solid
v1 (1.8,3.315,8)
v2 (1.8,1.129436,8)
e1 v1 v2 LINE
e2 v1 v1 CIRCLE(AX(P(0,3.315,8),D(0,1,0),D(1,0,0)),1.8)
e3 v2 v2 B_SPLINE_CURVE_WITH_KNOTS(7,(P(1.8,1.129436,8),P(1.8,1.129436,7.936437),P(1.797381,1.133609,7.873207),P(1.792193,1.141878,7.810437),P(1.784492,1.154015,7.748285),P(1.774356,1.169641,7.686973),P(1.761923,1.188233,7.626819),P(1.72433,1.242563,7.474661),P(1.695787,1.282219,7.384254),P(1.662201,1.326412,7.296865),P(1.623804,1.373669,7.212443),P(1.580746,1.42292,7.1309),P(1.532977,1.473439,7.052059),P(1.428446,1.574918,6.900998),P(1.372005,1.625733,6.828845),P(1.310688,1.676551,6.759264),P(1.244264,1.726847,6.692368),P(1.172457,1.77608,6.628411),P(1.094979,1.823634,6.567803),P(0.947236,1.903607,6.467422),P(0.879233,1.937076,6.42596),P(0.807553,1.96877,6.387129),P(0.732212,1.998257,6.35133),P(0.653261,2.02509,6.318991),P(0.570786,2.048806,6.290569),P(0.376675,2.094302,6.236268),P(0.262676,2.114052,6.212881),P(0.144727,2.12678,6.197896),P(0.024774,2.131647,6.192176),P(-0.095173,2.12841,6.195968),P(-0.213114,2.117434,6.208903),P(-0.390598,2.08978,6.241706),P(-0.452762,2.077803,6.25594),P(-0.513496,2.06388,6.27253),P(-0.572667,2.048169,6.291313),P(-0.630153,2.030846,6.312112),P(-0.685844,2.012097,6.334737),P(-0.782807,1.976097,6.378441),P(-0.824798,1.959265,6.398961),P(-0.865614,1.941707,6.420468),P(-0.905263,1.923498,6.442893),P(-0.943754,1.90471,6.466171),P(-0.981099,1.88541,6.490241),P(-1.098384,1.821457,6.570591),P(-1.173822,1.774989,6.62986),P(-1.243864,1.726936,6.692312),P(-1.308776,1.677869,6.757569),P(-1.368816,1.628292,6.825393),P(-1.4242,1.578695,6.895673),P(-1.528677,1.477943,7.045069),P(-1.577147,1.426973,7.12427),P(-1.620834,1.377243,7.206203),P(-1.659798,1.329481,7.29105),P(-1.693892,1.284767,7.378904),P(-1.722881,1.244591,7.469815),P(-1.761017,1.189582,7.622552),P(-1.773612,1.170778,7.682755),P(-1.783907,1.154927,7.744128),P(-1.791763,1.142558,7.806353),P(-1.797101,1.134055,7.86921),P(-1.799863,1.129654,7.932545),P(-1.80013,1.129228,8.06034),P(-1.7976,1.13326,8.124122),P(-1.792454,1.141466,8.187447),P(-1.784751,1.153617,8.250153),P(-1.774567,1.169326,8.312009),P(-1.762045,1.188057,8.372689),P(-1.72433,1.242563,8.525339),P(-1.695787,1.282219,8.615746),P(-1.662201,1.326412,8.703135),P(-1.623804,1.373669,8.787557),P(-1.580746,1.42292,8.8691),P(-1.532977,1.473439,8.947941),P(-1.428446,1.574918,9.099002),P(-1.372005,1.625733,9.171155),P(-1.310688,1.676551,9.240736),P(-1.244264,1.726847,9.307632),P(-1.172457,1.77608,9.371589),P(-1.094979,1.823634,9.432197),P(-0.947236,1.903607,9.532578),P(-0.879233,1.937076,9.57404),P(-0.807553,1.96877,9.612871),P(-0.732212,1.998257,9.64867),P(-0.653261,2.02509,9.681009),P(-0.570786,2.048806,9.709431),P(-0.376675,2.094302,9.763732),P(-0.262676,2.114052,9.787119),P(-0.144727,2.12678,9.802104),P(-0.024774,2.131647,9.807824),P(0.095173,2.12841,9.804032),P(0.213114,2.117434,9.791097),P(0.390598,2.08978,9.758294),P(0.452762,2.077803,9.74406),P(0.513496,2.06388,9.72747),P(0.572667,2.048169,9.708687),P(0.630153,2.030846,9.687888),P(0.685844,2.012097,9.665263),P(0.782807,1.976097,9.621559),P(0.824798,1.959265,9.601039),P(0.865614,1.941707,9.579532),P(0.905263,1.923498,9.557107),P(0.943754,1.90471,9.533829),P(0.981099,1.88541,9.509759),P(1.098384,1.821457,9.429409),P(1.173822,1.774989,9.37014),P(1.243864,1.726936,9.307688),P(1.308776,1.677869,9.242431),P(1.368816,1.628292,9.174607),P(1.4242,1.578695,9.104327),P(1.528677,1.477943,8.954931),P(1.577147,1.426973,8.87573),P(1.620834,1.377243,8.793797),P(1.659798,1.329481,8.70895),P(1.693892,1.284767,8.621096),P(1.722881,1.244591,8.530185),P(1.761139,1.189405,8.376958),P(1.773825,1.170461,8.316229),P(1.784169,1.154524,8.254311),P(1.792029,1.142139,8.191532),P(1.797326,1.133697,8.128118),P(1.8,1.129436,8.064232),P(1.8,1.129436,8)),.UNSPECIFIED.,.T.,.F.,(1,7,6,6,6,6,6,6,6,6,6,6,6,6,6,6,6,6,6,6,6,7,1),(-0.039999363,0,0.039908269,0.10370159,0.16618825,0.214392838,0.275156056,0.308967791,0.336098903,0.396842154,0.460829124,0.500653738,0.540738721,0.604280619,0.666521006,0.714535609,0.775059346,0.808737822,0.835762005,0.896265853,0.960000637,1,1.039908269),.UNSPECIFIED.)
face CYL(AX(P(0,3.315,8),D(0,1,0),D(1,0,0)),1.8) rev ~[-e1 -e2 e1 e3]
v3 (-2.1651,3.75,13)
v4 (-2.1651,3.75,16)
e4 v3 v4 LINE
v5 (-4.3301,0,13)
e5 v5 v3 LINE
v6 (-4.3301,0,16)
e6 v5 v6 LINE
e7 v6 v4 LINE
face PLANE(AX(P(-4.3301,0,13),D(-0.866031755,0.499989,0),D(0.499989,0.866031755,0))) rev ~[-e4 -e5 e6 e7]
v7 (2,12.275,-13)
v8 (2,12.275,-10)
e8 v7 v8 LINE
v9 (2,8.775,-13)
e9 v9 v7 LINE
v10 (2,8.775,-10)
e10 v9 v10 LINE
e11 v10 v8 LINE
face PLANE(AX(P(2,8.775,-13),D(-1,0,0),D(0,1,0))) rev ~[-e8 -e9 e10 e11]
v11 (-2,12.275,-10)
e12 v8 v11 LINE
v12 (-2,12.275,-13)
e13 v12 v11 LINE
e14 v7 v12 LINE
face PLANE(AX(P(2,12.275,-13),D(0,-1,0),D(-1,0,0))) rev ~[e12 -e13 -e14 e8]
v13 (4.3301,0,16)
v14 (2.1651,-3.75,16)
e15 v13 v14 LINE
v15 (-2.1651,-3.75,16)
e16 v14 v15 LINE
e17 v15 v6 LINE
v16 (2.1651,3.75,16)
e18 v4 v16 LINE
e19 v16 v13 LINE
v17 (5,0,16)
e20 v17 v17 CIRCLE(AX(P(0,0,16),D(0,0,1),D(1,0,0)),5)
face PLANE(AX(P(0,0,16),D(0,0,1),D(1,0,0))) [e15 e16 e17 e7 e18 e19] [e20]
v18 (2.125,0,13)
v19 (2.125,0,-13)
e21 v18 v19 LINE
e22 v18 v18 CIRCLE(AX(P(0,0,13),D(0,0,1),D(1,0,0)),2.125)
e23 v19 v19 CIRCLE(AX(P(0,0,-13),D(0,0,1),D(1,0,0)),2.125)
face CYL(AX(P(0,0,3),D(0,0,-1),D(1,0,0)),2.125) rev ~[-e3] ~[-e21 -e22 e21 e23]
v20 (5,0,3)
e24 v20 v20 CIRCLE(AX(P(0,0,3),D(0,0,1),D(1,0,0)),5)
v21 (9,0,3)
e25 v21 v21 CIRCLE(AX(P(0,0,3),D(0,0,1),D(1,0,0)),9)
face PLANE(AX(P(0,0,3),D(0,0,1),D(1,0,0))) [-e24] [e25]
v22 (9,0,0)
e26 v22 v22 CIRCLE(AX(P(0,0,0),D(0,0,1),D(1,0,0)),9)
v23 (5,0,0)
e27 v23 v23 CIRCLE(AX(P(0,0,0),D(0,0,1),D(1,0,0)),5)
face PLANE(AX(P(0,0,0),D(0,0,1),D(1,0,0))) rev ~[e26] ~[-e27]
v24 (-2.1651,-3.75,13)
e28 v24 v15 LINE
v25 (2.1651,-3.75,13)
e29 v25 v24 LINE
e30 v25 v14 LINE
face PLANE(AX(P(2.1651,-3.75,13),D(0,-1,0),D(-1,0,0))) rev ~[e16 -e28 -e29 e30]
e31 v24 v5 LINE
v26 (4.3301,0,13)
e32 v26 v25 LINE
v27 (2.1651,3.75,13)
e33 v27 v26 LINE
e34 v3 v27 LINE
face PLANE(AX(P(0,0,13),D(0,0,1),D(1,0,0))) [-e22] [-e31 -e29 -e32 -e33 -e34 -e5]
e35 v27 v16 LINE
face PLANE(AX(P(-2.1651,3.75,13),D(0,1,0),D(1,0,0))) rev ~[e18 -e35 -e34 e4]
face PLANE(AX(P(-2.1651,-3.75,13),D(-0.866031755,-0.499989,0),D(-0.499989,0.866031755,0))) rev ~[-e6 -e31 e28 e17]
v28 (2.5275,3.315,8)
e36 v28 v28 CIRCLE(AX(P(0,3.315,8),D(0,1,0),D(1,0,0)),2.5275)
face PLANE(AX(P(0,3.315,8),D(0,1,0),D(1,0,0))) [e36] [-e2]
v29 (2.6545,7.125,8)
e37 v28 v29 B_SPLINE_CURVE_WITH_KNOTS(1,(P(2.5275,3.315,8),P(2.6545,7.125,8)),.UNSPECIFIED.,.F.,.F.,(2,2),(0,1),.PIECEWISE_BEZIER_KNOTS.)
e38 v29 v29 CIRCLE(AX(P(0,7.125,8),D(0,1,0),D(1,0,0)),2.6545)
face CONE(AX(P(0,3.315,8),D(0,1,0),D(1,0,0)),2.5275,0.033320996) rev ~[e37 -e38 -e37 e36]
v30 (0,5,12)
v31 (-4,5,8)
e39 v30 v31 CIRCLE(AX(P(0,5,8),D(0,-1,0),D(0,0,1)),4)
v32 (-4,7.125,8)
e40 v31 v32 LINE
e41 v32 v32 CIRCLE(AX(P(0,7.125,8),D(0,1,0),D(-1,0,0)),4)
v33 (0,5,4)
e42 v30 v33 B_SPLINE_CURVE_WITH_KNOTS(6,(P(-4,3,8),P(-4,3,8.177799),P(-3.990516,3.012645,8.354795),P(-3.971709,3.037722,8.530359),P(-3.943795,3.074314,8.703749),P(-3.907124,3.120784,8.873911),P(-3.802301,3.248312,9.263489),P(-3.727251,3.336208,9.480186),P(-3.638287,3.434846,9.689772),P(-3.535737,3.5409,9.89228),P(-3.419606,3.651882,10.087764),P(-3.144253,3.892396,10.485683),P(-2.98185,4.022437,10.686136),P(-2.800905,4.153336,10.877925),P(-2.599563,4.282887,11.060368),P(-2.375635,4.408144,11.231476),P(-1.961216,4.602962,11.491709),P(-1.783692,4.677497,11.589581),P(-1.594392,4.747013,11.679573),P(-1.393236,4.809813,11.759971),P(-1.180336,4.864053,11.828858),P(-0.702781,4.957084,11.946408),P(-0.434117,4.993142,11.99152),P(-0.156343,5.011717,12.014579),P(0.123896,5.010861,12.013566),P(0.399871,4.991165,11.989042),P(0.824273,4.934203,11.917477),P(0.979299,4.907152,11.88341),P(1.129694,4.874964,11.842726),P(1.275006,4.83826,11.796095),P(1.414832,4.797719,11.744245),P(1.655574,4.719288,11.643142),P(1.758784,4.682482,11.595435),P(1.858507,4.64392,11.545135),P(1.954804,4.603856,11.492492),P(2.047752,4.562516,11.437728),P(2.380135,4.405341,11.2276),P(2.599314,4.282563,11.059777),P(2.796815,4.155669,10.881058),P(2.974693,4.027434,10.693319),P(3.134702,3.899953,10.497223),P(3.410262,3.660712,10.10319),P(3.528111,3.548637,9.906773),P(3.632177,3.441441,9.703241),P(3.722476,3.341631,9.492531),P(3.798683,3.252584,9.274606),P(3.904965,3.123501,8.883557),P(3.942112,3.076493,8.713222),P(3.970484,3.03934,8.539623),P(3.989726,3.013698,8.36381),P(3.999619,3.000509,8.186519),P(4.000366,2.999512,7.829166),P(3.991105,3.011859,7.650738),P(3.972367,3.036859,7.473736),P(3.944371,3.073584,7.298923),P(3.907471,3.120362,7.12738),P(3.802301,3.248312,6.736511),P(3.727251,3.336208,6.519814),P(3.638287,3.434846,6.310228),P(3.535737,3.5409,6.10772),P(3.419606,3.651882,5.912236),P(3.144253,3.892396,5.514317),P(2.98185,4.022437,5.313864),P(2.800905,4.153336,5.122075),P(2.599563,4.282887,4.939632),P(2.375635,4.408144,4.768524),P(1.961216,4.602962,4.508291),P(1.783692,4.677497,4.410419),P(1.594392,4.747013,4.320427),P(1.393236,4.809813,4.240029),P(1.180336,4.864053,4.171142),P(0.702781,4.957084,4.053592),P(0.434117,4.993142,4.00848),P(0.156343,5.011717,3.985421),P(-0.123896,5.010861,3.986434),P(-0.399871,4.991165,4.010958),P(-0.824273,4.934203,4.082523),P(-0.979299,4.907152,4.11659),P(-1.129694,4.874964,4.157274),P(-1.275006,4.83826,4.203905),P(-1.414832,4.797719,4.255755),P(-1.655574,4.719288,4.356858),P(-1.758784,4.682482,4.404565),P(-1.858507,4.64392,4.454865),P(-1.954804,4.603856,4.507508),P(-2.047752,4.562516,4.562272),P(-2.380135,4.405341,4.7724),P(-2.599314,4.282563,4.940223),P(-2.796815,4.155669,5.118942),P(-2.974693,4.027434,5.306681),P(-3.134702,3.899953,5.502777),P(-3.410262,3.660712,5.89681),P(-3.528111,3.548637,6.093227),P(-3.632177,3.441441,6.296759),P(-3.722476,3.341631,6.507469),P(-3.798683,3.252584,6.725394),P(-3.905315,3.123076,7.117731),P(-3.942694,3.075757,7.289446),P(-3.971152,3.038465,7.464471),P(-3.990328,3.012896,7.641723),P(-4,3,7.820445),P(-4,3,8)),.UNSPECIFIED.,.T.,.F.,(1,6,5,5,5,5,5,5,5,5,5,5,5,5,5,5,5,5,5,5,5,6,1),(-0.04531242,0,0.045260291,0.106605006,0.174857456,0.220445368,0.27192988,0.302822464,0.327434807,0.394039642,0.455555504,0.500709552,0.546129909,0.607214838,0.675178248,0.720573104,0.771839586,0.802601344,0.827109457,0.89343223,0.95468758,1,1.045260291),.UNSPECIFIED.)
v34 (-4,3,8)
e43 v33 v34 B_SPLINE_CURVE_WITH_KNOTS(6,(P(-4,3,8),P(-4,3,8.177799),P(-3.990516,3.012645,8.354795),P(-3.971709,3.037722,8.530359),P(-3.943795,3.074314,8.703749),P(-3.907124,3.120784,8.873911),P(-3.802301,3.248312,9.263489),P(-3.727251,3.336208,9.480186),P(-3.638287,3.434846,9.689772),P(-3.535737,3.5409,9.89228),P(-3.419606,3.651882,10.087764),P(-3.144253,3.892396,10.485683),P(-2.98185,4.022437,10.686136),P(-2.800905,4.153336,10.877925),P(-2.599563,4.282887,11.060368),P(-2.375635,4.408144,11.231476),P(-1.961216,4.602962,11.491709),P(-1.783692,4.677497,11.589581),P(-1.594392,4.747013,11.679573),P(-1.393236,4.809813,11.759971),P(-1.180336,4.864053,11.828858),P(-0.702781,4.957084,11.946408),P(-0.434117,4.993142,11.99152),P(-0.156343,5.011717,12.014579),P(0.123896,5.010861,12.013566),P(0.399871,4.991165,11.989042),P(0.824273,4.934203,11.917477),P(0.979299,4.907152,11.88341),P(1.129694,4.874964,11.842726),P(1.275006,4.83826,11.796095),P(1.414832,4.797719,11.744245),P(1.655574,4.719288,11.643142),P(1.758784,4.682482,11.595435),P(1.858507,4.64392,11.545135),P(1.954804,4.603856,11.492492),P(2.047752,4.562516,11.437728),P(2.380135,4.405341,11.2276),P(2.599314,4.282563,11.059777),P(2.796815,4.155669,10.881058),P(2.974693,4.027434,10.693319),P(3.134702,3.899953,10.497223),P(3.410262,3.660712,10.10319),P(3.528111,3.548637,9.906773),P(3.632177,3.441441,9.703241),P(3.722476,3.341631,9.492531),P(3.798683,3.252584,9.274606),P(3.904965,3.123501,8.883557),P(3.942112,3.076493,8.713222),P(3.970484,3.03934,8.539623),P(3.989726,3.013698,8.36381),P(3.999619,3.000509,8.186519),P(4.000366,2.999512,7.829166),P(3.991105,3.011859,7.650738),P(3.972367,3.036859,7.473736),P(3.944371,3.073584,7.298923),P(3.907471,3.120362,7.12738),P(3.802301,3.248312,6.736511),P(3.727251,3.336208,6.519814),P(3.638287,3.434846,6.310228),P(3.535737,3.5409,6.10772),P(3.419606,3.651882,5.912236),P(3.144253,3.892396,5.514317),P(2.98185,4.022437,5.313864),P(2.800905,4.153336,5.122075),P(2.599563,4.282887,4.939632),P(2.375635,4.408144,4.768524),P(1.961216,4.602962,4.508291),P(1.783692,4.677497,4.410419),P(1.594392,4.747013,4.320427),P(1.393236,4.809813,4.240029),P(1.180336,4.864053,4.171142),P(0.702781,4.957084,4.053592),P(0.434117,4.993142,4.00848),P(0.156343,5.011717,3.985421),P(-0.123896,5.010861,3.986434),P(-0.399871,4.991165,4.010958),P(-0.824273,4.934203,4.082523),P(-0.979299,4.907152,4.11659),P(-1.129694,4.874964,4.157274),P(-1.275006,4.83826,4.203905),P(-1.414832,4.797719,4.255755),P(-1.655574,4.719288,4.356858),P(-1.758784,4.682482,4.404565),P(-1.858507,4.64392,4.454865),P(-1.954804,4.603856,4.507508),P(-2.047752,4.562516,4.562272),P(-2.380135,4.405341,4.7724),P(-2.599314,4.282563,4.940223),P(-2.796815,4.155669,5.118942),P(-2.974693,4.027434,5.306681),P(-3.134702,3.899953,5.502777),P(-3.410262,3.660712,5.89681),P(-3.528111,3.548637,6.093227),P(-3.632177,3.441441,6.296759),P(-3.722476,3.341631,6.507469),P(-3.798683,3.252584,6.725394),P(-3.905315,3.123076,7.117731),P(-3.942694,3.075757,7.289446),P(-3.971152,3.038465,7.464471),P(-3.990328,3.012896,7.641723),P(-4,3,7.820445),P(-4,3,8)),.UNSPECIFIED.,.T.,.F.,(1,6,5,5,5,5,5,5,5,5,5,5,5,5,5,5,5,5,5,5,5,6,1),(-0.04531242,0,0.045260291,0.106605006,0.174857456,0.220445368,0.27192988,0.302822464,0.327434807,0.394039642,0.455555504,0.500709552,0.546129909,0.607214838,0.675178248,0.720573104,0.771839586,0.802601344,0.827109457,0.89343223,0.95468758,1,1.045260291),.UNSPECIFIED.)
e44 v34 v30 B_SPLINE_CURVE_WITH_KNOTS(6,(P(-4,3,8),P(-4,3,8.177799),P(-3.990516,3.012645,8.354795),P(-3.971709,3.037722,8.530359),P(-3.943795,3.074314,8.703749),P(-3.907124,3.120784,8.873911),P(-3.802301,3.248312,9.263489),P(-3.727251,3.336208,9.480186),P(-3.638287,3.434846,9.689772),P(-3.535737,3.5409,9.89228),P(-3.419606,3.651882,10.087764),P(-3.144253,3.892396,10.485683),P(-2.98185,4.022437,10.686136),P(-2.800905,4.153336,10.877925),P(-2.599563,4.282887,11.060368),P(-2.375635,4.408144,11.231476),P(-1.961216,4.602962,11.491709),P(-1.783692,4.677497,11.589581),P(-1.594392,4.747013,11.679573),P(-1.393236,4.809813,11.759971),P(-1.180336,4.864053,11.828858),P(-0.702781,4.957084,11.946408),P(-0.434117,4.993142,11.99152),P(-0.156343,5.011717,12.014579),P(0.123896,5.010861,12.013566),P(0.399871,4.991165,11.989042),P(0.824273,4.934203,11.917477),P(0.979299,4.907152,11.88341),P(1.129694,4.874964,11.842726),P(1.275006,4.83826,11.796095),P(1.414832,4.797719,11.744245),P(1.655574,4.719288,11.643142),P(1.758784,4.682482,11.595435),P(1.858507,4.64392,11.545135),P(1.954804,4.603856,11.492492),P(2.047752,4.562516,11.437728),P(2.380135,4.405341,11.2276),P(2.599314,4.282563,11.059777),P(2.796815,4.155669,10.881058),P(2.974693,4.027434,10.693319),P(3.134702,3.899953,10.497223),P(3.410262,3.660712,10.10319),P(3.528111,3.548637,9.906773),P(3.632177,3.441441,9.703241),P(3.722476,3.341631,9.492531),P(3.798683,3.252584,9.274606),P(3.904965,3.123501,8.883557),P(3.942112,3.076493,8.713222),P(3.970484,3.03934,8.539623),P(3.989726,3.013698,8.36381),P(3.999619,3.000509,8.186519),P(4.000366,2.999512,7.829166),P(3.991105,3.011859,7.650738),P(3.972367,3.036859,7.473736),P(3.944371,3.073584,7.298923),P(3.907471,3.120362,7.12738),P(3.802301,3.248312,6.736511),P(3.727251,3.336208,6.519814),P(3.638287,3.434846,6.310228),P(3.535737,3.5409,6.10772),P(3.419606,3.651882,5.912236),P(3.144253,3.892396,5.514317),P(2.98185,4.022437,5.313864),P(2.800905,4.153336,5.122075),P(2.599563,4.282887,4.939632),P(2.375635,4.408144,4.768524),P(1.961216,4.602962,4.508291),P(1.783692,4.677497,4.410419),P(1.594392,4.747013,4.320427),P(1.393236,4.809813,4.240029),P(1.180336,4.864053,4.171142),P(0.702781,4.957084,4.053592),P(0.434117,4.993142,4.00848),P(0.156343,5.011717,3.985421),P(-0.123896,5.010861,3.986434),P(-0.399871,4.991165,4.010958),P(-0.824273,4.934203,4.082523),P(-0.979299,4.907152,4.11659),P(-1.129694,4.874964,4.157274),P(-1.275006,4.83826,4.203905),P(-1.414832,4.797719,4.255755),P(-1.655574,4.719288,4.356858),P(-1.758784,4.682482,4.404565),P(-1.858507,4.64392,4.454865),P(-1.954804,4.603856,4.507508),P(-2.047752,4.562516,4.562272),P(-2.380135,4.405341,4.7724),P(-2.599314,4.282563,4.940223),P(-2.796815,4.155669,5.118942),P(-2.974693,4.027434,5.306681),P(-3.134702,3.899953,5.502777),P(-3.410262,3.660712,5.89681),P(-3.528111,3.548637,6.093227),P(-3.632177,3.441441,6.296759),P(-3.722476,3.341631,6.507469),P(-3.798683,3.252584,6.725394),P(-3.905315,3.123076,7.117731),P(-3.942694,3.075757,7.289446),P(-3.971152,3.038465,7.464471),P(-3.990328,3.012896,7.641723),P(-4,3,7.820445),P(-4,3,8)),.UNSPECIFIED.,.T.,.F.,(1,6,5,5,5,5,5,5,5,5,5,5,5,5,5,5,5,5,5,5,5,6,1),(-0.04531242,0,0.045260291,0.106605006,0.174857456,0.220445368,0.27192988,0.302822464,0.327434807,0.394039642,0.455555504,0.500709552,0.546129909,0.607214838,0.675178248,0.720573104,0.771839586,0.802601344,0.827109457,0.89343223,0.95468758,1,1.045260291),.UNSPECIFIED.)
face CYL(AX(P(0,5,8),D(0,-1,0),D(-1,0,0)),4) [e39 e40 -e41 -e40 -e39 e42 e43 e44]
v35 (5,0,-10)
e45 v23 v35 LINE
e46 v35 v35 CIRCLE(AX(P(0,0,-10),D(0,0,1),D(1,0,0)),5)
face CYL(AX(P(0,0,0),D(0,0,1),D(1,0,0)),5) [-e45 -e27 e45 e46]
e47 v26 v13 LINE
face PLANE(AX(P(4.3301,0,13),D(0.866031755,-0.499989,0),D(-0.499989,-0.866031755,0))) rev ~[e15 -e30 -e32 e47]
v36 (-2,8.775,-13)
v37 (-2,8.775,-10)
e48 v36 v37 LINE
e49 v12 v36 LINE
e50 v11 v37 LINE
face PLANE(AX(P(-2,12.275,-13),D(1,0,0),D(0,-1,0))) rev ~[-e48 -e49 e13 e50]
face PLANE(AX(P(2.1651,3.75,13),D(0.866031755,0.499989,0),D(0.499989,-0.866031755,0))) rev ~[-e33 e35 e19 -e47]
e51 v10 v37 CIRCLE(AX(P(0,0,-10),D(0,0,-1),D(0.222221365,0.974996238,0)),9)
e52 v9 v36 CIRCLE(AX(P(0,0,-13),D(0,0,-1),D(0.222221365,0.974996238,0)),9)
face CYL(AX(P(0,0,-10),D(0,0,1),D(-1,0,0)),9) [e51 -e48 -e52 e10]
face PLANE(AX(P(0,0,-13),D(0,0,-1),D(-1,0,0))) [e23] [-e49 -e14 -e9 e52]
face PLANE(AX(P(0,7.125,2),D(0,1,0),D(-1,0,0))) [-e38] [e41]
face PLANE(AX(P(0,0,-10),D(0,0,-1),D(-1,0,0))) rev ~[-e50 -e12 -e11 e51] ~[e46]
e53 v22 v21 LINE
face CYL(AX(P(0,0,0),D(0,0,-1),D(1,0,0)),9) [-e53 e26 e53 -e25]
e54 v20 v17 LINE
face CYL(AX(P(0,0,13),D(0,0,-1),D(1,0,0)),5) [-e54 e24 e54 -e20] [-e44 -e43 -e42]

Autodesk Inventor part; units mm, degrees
ref_plane "YZ Plane" through (0, 0, 0) normal (1, 0, 0) x (0, 1, 0)
ref_plane "XZ Plane" through (0, 0, 0) normal (0, 1, 0) x (-1, 0, 0)
ref_plane "XY Plane" through (0, 0, 0) normal (0, 0, 1) x (1, 0, 0)
sketch "Sketch1" plane through (0, 0, 0) normal (0, 0, 1) x (1, 0, 0)
  circle A0 centre (0, 0) radius 5
  circle A1 centre (0, 0) radius 9
  circle A2 centre (0, 0) radius 2.125
  dimension "d0" = 10
  dimension "d1" = 18
  dimension "d2" = 4.25
extrude "Extrusion1" add sketch "Sketch1" against normal blind 10 contours A0 | A2
extrude "Extrusion2" add sketch "Sketch1" along normal blind 3 contours A0 | A1 | A2
sketch "Sketch2" plane through (0, 0, -10) normal (0, 0, -1) x (-1, 0, 0)
  circle A0 centre (0, 0) radius 9 projected
extrude "Extrusion3" add sketch "Sketch2" along normal blind 3
sketch "Sketch3" plane through (0, 0, 3) normal (0, 0, 1) x (1, 0, 0)
  circle A0 centre (0, 0) radius 5 projected
  circle A1 centre (0, 0) radius 2.125
  dimension "d9" = 4.25
extrude "Extrusion4" add sketch "Sketch3" along normal blind 10
ref_plane "Work Plane1" through (0, 0, -5) normal (0, 0, 1) x (1, 0, 0)
sketch "Sketch4" plane through (0, 0, -5) normal (0, 0, 1) x (1, 0, 0)
  circle A0 centre (0, 0) radius 5 projected
  arc A1 (1.5, 4.7697) -> (-1.5, 4.7697) centre (0, 0) ccw
  line L0 (0, 0) -> (0, 5) construction
  line L1 (-1.5, 4.7697) -> (-1.5, 9.7697)
  line L2 (-1.5, 9.7697) -> (1.5, 9.7697)
  line L3 (1.5, 9.7697) -> (1.5, 4.7697)
  dimension "d12" = 5
  dimension "d13" = 3
ref_plane "Work Plane2" through (0, 5, 2) normal (0, 1, 0) x (-1, 0, 0)
sketch "Sketch5" plane through (0, 5, 2) normal (0, 1, 0) x (-1, 0, 0)
  line L0 (5, 11) -> (-5, 11) projected
  line L1 (-5, 1) -> (5, 1) projected
  line L2 (-5, 11) -> (5, 1) construction
  line L3 (5, 11) -> (-5, 1) construction
  point P0 (0, -2)
  point P1 (0, 6)
extrude "Extrusion6" cut sketch "Sketch3" against normal up to surface (16 mm away) contours A1
sketch "Sketch6" plane through (0, 5, 2) normal (0, 1, 0) x (-1, 0, 0)
  line L0 (5, 11) -> (-5, 1) construction
  line L1 (-5, 11) -> (5, 1) construction
  circle A0 centre (0, 6) radius 4
  point P0 (0, -2)
  dimension "d18" = 8
extrude "Extrusion7" add sketch "Sketch6" against normal up to surface
extrude "Extrusion8" add sketch "Sketch6" along normal blind 2.125
sketch "Sketch7" plane through (0, 7.125, 8) normal (0, 1, 0) x (1, 0, 0)
  line L0 (5, -5) -> (-5, 5) construction
  line L1 (-5, -5) -> (5, 5) construction
  circle A0 centre (0, 0) radius 4 projected
  circle A1 centre (0, 0) radius 2.5275
  point P0 (0, 8)
  dimension "d23" = 5.055
extrude "Extrusion9" cut sketch "Sketch7" against normal blind 3.81 contours A1
sketch "Sketch8" plane through (0, 7.125, 8) normal (0, 1, 0) x (1, 0, 0)
  line L0 (-5, -5) -> (5, 5) construction
  line L1 (5, -5) -> (-5, 5) construction
  circle A0 centre (0, 0) radius 2.6545
  point P0 (0, 8)
  dimension "d26" = 5.309
loft "Loft1" cut profiles "Sketch8" section 1 edges at (-2.5275, 3.315, 8)
sketch "Sketch9" plane through (0, 3.315, 8) normal (0, 1, 0) x (1, 0, 0)
  line L0 (-5, -5) -> (5, 5) construction
  line L1 (5, -5) -> (-5, 5) construction
  circle A0 centre (0, 0) radius 1.8
  point P0 (0, 8)
  dimension "d31" = 3.6
extrude "Extrusion10" cut sketch "Sketch9" against normal up to surface
sketch "Sketch10" plane through (0, 0, -13) normal (0, 0, -1) x (-1, 0, 0)
  circle A0 centre (0, 0) radius 2.125 projected
  circle A1 centre (0, 0) radius 9 projected
  line L0 (0, 0) -> (0, 9) construction
  line L1 (-2, 8.775) -> (-2, 12.275)
  line L2 (-2, 12.275) -> (2, 12.275)
  line L3 (2, 12.275) -> (2, 8.775)
  arc A2 (2, 8.775) -> (-2, 8.775) centre (0, 0) ccw
  dimension "d34" = 3.5
  dimension "d35" = 4
extrude "Extrusion11" add sketch "Sketch10" against normal up to surface (3 mm away) contours A1 L1 L2 L3
sketch "Sketch12" plane through (0, 0, 13) normal (0, 0, 1) x (1, 0, 0)
  line L0 (2.1651, -3.75) -> (-2.1651, -3.75)
  line L1 (-2.1651, -3.75) -> (-4.3301, 0)
  line L2 (-4.3301, 0) -> (-2.1651, 3.75)
  line L3 (-2.1651, 3.75) -> (2.1651, 3.75)
  line L4 (2.1651, 3.75) -> (4.3301, 0)
  line L5 (4.3301, 0) -> (2.1651, -3.75)
  circle A0 centre (0, 0) radius 5 projected
  line L6 (0, 0) -> (0, -5) construction
  circle A1 centre (0, 0) radius 5
  point P0 (0, 5)
  dimension "d39" = 7.5
extrude "Extrusion12" add sketch "Sketch12" along normal blind 3
properties part number "stationarySpindle"
